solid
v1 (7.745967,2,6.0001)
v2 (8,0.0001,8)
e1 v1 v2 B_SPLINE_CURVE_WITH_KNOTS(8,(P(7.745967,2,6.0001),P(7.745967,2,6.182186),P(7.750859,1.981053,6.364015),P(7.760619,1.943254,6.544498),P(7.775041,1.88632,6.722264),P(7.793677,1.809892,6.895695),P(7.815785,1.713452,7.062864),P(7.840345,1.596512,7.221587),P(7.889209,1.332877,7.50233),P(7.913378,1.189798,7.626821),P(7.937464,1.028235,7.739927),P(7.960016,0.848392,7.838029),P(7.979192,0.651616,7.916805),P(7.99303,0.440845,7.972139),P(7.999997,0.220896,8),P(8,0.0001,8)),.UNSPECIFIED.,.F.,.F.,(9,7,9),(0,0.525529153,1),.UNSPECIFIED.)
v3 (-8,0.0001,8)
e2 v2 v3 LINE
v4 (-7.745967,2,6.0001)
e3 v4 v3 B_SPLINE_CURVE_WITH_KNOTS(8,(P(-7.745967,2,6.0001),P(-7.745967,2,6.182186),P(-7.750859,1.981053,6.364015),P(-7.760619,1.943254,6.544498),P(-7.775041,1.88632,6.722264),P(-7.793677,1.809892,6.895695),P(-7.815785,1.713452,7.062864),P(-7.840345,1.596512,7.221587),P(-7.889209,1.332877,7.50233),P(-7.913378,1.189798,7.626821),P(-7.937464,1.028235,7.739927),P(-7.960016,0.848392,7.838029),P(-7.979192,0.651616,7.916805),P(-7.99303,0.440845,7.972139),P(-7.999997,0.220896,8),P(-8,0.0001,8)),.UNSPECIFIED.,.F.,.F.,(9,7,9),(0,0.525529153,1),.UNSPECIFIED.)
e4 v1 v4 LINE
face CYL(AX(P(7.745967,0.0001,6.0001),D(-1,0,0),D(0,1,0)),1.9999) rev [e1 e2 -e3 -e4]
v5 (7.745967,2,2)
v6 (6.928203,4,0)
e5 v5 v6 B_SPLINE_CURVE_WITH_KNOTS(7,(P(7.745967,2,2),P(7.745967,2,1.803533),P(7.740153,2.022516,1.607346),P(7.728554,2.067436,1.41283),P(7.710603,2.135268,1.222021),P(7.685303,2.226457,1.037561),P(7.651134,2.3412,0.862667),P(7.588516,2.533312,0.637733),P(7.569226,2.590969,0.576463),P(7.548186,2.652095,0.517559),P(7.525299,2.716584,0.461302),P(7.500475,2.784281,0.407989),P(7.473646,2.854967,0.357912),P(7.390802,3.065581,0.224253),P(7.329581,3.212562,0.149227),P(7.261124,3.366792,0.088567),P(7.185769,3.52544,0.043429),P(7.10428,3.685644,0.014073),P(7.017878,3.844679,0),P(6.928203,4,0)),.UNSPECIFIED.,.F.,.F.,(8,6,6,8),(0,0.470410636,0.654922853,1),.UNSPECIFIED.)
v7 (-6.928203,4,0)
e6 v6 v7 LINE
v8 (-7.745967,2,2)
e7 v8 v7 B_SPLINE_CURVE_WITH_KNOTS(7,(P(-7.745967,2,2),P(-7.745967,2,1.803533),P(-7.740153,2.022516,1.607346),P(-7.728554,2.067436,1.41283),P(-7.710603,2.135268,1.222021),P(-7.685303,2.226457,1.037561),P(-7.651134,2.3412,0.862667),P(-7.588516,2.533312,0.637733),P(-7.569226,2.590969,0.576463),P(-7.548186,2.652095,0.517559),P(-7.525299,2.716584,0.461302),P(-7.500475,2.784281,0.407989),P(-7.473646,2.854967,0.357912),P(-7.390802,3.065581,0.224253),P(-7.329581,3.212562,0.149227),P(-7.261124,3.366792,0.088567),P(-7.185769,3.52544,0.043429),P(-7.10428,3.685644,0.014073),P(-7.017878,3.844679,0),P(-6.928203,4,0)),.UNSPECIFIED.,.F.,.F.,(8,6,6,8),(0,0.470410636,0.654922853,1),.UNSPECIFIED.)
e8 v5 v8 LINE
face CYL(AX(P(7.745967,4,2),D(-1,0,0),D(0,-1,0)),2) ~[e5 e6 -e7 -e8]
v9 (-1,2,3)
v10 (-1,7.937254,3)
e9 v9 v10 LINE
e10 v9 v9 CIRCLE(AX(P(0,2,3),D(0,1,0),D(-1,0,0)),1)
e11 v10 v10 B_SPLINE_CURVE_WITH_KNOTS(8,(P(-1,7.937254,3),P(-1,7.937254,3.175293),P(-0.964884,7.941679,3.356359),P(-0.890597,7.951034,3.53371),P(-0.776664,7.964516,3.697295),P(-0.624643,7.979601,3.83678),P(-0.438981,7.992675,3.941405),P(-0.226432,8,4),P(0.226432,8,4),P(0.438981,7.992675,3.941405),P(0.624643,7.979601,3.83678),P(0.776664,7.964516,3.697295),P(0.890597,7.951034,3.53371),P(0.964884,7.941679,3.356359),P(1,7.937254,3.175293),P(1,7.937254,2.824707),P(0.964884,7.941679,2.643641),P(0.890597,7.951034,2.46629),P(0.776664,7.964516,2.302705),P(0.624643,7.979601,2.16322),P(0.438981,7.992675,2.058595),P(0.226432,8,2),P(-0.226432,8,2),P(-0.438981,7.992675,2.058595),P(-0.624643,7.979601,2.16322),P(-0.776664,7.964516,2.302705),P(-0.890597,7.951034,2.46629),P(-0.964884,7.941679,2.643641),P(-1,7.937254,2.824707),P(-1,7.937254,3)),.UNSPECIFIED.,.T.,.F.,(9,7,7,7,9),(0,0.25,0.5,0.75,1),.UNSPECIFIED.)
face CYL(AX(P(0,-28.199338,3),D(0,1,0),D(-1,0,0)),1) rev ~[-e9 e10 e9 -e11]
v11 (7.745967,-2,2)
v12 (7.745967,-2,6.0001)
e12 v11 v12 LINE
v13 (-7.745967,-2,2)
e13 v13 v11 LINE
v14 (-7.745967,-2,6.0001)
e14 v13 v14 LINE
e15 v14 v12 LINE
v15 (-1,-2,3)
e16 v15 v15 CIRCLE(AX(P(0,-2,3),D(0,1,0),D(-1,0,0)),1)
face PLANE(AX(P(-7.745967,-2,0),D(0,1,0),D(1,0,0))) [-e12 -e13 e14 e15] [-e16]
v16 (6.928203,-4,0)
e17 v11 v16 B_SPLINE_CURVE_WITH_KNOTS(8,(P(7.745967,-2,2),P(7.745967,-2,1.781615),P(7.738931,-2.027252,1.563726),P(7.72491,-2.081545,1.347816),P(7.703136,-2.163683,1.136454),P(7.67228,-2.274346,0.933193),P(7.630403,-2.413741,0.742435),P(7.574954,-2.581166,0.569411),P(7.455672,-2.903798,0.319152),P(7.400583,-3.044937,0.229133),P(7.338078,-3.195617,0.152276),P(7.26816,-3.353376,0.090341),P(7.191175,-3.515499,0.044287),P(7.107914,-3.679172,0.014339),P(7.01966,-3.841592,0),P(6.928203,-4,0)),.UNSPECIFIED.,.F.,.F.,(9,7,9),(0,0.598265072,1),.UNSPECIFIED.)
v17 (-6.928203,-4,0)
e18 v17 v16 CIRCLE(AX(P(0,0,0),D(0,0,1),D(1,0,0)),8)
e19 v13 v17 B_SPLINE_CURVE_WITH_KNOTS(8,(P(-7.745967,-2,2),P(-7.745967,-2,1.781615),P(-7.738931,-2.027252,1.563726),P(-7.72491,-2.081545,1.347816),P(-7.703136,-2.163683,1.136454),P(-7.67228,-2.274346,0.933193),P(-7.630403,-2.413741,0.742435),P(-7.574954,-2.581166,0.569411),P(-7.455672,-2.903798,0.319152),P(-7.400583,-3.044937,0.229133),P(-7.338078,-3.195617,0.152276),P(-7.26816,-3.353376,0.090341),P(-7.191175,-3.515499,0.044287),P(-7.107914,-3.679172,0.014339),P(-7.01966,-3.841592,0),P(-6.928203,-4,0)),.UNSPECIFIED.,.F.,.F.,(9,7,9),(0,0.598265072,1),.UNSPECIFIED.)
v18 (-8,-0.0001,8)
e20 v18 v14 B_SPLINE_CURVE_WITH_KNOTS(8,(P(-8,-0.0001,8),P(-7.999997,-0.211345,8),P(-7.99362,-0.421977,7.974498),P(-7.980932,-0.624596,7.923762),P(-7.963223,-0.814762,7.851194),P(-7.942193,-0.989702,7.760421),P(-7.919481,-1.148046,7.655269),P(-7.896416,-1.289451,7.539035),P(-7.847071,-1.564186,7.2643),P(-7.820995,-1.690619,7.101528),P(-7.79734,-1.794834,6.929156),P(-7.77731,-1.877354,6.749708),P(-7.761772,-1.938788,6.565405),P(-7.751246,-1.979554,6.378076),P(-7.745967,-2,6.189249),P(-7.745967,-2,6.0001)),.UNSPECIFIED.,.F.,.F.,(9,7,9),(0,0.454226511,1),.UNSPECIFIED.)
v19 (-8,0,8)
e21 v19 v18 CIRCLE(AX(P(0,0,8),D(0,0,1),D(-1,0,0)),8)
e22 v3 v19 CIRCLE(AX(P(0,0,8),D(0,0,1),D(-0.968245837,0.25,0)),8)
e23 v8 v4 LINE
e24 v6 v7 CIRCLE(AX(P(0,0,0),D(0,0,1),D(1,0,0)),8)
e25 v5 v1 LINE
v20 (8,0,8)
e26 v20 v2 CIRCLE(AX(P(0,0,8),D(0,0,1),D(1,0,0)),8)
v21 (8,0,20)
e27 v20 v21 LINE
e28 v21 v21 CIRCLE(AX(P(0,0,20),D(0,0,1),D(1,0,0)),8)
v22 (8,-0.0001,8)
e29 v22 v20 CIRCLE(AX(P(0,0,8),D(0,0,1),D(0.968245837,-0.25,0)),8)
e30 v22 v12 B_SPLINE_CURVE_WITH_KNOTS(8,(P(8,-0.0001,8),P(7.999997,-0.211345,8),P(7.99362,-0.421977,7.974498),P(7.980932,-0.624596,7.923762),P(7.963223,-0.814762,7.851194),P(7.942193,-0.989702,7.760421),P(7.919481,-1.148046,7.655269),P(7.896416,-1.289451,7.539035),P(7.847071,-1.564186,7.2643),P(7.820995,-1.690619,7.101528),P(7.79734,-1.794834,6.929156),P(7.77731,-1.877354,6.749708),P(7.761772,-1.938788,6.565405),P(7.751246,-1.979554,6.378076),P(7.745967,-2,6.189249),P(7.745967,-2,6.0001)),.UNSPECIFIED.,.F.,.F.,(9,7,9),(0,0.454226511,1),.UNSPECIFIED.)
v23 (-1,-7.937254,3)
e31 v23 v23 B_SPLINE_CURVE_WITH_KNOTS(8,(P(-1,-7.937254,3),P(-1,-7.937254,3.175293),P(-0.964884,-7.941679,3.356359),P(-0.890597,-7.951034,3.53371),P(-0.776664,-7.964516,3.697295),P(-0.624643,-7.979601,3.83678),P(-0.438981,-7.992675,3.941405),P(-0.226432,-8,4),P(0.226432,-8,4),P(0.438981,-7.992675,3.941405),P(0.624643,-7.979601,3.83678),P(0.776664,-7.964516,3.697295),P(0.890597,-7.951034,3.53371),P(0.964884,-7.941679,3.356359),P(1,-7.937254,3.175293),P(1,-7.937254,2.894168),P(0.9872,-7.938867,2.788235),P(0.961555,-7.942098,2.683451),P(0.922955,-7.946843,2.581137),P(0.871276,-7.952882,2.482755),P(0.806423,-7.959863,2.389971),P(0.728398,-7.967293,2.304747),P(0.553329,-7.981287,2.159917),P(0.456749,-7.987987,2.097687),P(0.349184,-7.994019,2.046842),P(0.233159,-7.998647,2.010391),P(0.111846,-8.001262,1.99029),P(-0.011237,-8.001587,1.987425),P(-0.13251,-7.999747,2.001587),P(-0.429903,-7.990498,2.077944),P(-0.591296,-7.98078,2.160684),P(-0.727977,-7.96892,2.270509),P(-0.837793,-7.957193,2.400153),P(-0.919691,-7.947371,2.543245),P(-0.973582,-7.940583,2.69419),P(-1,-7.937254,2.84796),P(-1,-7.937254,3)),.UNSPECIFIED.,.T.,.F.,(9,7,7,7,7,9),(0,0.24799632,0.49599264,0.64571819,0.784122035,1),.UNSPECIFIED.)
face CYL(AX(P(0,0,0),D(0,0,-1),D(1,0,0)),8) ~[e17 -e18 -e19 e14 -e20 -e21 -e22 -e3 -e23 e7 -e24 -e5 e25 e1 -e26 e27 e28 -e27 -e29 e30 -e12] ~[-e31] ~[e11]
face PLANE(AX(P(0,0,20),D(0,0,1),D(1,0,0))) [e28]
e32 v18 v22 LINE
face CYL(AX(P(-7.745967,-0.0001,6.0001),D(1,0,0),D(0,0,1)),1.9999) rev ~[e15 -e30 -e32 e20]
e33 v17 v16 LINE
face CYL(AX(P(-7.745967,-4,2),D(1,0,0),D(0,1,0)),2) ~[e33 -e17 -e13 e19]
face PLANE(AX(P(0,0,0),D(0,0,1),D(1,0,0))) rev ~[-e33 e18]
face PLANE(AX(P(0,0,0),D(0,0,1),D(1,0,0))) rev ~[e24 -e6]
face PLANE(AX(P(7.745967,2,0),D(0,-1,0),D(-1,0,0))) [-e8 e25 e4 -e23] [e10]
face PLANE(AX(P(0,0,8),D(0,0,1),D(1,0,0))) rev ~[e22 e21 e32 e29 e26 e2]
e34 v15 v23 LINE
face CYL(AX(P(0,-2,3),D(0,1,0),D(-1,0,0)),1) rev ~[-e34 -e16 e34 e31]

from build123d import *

# Parameters (mm, degrees)
F0_R     = 8
F1_DEPTH = 20
F3_DEPTH = 8
F5_D     = 2
F5_DEPTH = 6.001
F7_D     = 2
F8_R     = 2
F9_R     = 1.9999


# Not quite as in the source:
# - a fillet or chamfer is up to 0.001 mm smaller than in the source, because OpenCascade refuses the exact size


with BuildPart() as f1:
    # F0 (on Top) → F1 (new body)
    with BuildSketch(Plane.XY):
        Circle(F0_R)
    extrude(amount=F1_DEPTH)

    # F2 (on face) → F3 (cut)
    with BuildSketch(Plane.XY):
        with BuildLine():
            ThreePointArc((8, 0), (7.9362375701, 1.0080343399), (7.7459666924, 2))
            Line((7.7459666924, 2), (-7.7459666924, 2))
            ThreePointArc((-7.7459666924, 2), (-7.9362375701, 1.0080343399), (-8, 0))
            ThreePointArc((-8, 0), (-7.9362375701, -1.0080343399), (-7.7459666924, -2))
            Line((-7.7459666924, -2), (7.7459666924, -2))
            ThreePointArc((7.7459666924, -2), (7.9362375701, -1.0080343399), (8, 0))
        make_face()
    extrude(amount=F3_DEPTH, mode=Mode.SUBTRACT)

    # F5 (through all, one way)
    with BuildSketch(Plane(origin=(0, -2, 0), x_dir=(-1, 0, 0), z_dir=(0, 1, 0))):
        with Locations((0, 3)):
            Circle(F5_D / 2)
    extrude(amount=-F5_DEPTH, mode=Mode.SUBTRACT)

    # F7 (through all)
    with Locations(Plane.XZ.offset(-2)):
        with Locations((0, 3)):
            Hole(F7_D / 2)

    # F8
    f8_edges = [f1.edges().sort_by_distance(p)[0] for p in [
        (0, 2, 0),
        (0, -2, 0),
    ]]
    fillet(f8_edges, radius=F8_R)

    # F9 (radius 2 in the source; OpenCascade refuses exactly that, so slightly less here)
    f9_edges = [f1.edges().sort_by_distance(p)[0] for p in [
        (0, 2, 8),
        (0, -2, 8),
    ]]
    fillet(f9_edges, radius=F9_R)


solid = f1.part
